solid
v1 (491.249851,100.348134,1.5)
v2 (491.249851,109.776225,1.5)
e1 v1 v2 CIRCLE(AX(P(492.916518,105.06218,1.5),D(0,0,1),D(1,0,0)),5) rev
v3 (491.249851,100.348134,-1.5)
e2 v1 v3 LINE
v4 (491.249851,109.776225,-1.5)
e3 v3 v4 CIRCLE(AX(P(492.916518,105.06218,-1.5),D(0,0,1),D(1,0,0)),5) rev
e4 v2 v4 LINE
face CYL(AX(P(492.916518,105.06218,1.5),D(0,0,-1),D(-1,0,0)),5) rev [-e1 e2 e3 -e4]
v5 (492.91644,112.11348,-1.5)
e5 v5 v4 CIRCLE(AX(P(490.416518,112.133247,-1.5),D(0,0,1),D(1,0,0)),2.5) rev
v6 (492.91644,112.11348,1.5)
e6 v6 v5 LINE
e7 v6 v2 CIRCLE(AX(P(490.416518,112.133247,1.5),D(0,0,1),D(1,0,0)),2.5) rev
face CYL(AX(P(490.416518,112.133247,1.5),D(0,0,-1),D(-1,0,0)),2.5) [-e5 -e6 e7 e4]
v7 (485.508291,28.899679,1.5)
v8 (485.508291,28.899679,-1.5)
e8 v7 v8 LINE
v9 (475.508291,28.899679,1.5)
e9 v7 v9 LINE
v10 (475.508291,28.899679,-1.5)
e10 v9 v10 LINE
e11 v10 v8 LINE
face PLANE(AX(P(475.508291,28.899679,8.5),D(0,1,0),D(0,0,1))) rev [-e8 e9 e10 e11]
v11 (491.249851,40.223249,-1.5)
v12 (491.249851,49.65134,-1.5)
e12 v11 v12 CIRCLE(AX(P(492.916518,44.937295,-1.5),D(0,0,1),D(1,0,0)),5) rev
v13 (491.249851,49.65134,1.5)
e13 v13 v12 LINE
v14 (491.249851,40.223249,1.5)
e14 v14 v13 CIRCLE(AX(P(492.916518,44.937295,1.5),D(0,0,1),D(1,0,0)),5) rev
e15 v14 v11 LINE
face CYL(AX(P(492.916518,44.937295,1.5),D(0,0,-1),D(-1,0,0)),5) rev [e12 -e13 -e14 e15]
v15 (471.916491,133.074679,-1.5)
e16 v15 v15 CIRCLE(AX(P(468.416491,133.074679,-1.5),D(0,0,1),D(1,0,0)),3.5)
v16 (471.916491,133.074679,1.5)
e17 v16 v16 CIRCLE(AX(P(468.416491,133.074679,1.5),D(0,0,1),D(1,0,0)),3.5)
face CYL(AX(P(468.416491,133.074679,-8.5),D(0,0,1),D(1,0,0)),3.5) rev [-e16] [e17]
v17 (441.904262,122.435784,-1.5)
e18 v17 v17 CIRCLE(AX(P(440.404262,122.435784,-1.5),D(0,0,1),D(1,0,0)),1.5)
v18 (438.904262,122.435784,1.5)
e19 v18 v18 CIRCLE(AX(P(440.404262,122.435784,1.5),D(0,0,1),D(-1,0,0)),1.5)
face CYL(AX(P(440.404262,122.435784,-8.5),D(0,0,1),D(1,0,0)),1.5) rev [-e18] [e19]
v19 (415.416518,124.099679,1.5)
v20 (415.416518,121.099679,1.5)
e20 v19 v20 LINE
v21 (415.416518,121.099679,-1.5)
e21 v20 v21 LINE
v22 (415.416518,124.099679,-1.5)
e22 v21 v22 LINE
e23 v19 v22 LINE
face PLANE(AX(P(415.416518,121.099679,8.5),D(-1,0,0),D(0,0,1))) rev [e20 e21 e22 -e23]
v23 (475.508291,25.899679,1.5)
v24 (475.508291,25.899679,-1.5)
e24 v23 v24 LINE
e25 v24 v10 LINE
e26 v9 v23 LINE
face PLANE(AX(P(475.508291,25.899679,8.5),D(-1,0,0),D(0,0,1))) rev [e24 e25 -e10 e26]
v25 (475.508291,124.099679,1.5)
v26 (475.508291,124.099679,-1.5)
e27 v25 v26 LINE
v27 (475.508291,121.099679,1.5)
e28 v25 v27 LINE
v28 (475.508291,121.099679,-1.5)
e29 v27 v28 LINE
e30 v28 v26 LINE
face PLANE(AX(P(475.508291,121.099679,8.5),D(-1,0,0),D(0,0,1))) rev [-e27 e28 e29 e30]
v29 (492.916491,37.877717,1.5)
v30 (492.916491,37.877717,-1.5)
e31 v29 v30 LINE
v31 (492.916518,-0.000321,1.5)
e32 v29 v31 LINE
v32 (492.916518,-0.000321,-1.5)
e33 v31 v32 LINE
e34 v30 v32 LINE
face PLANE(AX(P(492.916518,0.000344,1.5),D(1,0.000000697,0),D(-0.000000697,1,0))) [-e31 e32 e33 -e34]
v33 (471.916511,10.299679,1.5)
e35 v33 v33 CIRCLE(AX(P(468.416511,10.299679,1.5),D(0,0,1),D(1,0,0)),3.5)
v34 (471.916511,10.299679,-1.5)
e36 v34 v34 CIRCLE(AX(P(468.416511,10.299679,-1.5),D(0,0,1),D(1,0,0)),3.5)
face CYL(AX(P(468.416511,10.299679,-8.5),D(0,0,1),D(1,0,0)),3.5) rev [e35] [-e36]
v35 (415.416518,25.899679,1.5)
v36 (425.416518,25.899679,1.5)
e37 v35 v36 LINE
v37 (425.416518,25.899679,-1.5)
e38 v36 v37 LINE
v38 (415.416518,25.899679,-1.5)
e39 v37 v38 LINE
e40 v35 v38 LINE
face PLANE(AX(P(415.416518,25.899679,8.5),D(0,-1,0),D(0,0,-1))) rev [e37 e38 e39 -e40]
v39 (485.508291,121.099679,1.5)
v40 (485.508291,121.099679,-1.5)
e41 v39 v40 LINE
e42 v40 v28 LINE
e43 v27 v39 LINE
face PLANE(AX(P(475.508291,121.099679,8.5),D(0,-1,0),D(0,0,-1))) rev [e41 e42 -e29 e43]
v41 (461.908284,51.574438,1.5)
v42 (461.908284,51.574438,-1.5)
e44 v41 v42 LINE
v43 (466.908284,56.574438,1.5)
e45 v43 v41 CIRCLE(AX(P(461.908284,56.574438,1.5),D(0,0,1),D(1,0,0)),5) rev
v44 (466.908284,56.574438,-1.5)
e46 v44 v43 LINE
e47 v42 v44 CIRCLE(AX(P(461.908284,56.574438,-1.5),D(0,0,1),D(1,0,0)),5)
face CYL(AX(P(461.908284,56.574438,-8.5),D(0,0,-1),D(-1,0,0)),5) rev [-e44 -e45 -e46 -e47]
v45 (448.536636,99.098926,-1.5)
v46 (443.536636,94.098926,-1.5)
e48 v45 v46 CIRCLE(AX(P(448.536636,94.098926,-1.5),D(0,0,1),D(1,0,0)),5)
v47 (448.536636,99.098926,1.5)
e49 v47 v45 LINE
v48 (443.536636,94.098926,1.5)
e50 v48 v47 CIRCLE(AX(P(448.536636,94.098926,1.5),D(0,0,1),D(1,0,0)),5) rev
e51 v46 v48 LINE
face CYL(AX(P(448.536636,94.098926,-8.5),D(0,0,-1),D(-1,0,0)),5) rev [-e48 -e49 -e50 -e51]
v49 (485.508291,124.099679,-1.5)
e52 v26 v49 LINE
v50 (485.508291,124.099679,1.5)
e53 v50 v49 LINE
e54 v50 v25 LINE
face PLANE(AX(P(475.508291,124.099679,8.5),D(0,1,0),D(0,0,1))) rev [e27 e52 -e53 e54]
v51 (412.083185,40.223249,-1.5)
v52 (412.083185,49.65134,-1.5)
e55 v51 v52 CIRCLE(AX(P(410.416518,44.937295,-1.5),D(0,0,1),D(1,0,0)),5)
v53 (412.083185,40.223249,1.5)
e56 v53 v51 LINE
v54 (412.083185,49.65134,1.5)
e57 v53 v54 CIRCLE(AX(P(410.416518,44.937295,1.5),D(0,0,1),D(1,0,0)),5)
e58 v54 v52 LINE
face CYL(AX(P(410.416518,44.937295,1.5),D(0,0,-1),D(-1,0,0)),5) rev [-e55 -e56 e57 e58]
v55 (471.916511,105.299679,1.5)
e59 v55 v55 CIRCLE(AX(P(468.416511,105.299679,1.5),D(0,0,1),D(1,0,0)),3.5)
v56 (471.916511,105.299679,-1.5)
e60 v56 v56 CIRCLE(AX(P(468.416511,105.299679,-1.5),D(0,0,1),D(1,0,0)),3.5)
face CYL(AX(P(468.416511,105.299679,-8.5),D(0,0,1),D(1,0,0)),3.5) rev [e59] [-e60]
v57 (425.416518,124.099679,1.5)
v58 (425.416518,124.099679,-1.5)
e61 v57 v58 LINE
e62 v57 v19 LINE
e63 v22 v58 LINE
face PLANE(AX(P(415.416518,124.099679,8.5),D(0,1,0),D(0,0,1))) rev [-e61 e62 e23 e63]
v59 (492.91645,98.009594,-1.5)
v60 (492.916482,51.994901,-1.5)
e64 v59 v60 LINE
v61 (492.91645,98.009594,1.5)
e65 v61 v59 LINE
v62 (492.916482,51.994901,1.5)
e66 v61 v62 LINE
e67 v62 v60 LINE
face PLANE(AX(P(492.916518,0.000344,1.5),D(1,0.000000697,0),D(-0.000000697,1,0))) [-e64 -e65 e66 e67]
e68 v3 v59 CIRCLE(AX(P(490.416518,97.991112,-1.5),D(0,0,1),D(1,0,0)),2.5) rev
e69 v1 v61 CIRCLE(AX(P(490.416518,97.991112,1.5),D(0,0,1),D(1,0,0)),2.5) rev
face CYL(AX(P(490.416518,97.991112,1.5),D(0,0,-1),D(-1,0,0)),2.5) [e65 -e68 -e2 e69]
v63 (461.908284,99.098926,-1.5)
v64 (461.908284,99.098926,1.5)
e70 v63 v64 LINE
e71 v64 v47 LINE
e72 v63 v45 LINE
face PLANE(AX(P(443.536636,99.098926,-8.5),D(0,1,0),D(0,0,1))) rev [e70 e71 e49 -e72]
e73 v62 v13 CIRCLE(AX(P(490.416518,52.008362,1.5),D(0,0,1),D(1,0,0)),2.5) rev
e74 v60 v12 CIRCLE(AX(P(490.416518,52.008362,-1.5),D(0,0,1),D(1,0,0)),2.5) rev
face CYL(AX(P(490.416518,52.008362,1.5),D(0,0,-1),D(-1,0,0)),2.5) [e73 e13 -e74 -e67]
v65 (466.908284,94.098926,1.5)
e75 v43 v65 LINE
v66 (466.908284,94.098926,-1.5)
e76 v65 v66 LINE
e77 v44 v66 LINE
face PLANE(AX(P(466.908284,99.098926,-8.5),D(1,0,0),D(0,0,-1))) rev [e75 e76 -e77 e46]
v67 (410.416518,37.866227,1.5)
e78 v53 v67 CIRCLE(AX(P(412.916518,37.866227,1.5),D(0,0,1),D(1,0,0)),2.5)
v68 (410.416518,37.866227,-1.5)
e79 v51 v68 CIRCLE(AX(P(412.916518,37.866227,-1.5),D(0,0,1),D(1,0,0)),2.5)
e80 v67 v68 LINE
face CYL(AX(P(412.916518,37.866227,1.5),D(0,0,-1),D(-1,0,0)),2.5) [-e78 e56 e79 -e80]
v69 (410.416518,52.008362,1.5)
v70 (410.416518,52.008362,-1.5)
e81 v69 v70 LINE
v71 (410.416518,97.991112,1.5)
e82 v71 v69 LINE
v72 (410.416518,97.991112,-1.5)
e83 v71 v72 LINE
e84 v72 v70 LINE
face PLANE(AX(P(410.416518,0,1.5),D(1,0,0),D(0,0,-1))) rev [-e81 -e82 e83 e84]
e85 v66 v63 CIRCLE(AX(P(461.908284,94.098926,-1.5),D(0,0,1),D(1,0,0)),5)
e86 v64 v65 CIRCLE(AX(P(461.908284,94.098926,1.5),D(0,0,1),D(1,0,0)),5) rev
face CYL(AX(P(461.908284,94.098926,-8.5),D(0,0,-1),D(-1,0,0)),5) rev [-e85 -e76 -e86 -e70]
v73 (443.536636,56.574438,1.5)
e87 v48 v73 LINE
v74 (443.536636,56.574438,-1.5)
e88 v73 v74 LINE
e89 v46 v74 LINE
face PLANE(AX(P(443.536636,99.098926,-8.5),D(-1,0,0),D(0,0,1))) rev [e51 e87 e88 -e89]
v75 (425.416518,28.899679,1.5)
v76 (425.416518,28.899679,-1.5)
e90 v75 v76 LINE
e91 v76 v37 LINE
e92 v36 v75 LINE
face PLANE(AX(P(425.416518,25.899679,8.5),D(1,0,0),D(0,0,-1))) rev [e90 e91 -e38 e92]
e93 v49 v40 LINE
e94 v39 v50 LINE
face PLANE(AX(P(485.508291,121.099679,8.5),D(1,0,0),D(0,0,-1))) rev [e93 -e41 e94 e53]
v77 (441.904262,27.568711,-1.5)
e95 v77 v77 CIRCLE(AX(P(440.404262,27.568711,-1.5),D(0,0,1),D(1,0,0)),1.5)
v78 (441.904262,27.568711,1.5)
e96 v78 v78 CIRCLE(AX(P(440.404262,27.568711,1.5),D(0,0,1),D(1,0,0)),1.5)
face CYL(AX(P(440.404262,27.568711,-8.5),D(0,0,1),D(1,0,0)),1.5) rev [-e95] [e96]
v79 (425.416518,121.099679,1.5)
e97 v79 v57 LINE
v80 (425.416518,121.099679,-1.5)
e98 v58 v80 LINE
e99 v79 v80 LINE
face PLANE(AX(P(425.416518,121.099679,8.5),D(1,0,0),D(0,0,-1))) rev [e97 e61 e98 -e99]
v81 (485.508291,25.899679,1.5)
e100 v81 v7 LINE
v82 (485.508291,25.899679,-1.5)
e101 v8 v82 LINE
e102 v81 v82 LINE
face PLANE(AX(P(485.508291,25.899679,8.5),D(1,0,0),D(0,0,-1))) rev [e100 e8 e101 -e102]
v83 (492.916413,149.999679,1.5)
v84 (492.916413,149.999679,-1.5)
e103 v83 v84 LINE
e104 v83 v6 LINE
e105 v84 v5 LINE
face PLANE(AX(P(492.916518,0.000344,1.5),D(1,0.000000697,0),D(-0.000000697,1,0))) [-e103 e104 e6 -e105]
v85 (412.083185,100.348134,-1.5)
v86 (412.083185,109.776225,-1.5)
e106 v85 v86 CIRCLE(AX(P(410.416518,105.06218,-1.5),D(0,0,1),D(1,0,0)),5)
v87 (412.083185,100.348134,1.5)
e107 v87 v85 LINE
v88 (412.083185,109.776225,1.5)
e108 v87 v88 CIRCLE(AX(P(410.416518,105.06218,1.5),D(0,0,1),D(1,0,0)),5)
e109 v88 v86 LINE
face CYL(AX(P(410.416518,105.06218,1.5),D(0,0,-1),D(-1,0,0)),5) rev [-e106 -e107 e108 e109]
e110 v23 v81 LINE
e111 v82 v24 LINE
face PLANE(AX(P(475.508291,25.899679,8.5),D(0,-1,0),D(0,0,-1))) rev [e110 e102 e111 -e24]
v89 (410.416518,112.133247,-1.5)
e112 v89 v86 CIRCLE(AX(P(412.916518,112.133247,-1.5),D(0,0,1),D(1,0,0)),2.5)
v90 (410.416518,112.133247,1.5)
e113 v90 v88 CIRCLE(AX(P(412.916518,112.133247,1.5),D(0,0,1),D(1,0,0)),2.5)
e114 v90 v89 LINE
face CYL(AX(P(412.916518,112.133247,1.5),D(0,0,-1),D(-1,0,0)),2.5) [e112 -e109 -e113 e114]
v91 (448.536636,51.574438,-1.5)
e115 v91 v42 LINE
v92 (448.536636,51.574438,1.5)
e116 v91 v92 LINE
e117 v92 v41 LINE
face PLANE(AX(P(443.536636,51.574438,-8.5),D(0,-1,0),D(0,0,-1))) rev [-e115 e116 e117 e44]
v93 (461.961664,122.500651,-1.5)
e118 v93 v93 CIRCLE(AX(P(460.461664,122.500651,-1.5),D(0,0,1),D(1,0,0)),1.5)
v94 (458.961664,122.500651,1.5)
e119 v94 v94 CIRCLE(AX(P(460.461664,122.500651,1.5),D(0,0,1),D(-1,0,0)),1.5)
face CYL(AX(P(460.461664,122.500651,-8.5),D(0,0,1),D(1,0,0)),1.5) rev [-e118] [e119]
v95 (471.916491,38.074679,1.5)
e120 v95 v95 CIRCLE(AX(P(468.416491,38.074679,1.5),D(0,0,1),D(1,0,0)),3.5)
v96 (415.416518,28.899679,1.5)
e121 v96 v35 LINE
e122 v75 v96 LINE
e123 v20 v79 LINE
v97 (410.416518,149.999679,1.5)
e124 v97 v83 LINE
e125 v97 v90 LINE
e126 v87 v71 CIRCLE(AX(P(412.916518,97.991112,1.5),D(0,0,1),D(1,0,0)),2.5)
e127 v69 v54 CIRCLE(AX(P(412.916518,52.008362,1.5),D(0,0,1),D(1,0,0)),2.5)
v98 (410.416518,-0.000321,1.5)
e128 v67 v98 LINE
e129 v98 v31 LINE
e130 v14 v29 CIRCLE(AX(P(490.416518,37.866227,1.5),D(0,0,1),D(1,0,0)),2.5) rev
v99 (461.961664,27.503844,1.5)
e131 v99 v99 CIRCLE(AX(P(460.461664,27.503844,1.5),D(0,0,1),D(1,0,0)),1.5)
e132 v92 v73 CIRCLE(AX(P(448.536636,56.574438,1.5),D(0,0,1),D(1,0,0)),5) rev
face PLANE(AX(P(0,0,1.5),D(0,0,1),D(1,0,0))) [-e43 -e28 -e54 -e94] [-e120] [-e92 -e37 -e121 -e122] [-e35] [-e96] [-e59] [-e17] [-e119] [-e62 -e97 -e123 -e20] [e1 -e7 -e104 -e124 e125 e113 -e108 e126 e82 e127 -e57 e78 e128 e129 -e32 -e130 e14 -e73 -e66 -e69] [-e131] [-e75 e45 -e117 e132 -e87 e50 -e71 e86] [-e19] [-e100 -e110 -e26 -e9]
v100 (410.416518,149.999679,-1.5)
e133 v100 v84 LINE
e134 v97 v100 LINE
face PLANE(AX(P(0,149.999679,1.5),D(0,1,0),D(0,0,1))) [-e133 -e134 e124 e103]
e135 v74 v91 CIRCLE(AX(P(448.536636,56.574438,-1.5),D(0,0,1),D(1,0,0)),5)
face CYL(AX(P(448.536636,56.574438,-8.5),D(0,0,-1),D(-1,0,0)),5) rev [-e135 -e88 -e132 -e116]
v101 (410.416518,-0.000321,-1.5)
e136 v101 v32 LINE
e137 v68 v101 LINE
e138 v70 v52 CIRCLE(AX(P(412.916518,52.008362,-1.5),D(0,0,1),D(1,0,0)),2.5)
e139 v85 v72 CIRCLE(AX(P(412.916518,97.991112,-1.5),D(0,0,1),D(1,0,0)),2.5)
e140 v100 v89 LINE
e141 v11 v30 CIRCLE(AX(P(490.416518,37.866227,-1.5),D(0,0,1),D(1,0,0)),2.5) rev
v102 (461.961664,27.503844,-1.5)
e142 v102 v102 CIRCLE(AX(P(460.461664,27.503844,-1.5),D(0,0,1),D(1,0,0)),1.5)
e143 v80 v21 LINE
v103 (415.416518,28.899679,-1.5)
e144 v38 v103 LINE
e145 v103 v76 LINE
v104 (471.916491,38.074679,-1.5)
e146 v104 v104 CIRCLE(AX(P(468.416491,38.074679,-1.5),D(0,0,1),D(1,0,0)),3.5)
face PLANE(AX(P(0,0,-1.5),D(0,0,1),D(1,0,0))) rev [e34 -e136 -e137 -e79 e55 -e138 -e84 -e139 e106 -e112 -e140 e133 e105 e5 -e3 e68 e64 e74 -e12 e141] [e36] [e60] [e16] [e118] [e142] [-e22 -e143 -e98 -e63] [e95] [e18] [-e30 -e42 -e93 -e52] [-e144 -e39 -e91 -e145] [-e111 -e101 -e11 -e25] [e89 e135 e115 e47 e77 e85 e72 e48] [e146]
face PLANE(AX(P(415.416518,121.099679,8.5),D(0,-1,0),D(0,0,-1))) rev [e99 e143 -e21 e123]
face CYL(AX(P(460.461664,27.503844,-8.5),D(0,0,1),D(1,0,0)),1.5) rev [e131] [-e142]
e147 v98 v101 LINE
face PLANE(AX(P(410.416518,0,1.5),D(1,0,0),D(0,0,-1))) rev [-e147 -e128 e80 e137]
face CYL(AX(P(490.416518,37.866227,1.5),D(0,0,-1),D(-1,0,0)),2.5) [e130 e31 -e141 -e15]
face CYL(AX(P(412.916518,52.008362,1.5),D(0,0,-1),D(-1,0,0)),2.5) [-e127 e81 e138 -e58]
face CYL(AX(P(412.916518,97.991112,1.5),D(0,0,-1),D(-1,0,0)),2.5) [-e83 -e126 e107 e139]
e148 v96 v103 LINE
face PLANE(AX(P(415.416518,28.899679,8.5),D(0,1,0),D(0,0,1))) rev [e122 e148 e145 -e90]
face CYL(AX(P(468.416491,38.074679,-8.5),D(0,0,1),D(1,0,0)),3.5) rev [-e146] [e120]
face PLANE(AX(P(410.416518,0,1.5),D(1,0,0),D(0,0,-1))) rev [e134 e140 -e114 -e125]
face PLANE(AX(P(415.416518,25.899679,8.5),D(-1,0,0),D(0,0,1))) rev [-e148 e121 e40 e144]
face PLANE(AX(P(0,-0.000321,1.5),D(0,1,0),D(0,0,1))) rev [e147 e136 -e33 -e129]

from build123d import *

# Parameters (mm, degrees)
SALIENTE_EXTRUIR1_START = -1.5
SALIENTE_EXTRUIR1_DEPTH = 3
CROQUIS4_W              = 23.371648172
CROQUIS4_H              = 47.52448784
CORTAR_EXTRUIR3_DEPTH   = 10
CROQUIS5_W              = 9.999999994
CROQUIS5_H              = 3
CROQUIS5_W_2            = 9.999999993
CORTAR_EXTRUIR4_DEPTH   = 10
CROQUIS6_R              = 1.5
CROQUIS6_R_2            = 3.5
CORTAR_EXTRUIR5_DEPTH   = 10
REDONDEO1_R             = 5


# Read off the part's stored shape, not the designer's step: Saliente-Extruir1
with BuildPart() as part:
    # Saliente-Extruir1 outline → Saliente-Extruir1 (new body)
    with BuildSketch(Plane.XY.offset(SALIENTE_EXTRUIR1_START)):
        with BuildLine():
            ThreePointArc((492.916449572, 98.009593947), (492.452410006, 99.442022929), (491.249851225, 100.348134338))
            ThreePointArc((491.249851225, 100.348134338), (487.916517891, 105.062179546), (491.249851225, 109.776224754))
            ThreePointArc((491.249851225, 109.776224754), (492.452037009, 110.681812922), (492.916439741, 112.113480025))
            Line((492.916439741, 112.113480025), (492.916413331, 149.999679341))
            Line((492.916413331, 149.999679341), (410.416517891, 149.999679341))
            Line((410.416517891, 149.999679341), (410.416517891, 112.133247358))
            ThreePointArc((410.416517891, 112.133247358), (410.875276439, 110.689871685), (412.083184558, 109.776224754))
            ThreePointArc((412.083184558, 109.776224754), (415.416517891, 105.062179546), (412.083184558, 100.348134338))
            ThreePointArc((412.083184558, 100.348134338), (410.875276439, 99.434487407), (410.416517891, 97.991111734))
            Line((410.416517891, 97.991111734), (410.416517891, 52.008362374))
            ThreePointArc((410.416517891, 52.008362374), (410.875276439, 50.564986701), (412.083184558, 49.65133977))
            ThreePointArc((412.083184558, 49.65133977), (415.416517891, 44.937294562), (412.083184558, 40.223249354))
            ThreePointArc((412.083184558, 40.223249354), (410.875276439, 39.309602423), (410.416517891, 37.86622675))
            Line((410.416517891, 37.86622675), (410.416517891, -0.000320659))
            Line((410.416517891, -0.000320659), (492.916517891, -0.000320659))
            Line((492.916517891, -0.000320659), (492.916491488, 37.877716604))
            ThreePointArc((492.916491488, 37.877716604), (492.45443711, 39.314289338), (491.249851225, 40.223249354))
            ThreePointArc((491.249851225, 40.223249354), (487.916517891, 44.937294562), (491.249851225, 49.65133977))
            ThreePointArc((491.249851225, 49.65133977), (492.453865854, 50.559496169), (492.916481647, 51.994900607))
            Line((492.916481647, 51.994900607), (492.916449572, 98.009593947))
        make_face()
    extrude(amount=SALIENTE_EXTRUIR1_DEPTH)

    # Croquis4 → Cortar-Extruir3 (cut)
    with BuildSketch(Plane.XY.offset(1.5)):
        with Locations((455.222459901, 75.336681949)):
            Rectangle(CROQUIS4_W, CROQUIS4_H)
    extrude(amount=-CORTAR_EXTRUIR3_DEPTH, mode=Mode.SUBTRACT)

    # Croquis5 → Cortar-Extruir4 (cut)
    with BuildSketch(Plane(origin=(0, 0, -1.5), x_dir=(-1, 0, 0), z_dir=(0, 0, -1))):
        with Locations((-420.416517885, 27.399679341)):
            Rectangle(CROQUIS5_W, CROQUIS5_H)
        with Locations((-480.50829052, 27.399679341)):
            Rectangle(CROQUIS5_W_2, CROQUIS5_H)
        with Locations((-480.50829052, 122.599679342)):
            Rectangle(CROQUIS5_W_2, CROQUIS5_H)
        with Locations((-420.416517885, 122.599679342)):
            Rectangle(CROQUIS5_W, CROQUIS5_H)
    extrude(amount=-CORTAR_EXTRUIR4_DEPTH, mode=Mode.SUBTRACT)

    # Croquis6 → Cortar-Extruir5 (cut)
    with BuildSketch(Plane.XY.offset(1.5)):
        with Locations((460.461664074, 27.503843939)):
            Circle(CROQUIS6_R)
        with Locations((440.404261852, 27.568711017)):
            Circle(CROQUIS6_R)
        with Locations((468.41649135, 38.074679341)):
            Circle(CROQUIS6_R_2)
        with Locations((468.416510711, 10.299679341)):
            Circle(CROQUIS6_R_2)
        with Locations((440.404261852, 122.435783537)):
            Circle(CROQUIS6_R)
        with Locations((460.461664074, 122.500650615)):
            Circle(CROQUIS6_R)
        with Locations((468.41649135, 133.074679341)):
            Circle(CROQUIS6_R_2)
        with Locations((468.416510711, 105.299679341)):
            Circle(CROQUIS6_R_2)
    extrude(amount=-CORTAR_EXTRUIR5_DEPTH, mode=Mode.SUBTRACT)

    # Redondeo1
    redondeo1_edges = [part.edges().sort_by_distance(p)[0] for p in [
        (466.908283987, 99.098925869, 0),
        (466.908283987, 51.574438029, 0),
        (443.536635815, 51.574438029, 0),
        (443.536635815, 99.098925869, 0),
    ]]
    fillet(redondeo1_edges, radius=REDONDEO1_R)


solid = part.part
